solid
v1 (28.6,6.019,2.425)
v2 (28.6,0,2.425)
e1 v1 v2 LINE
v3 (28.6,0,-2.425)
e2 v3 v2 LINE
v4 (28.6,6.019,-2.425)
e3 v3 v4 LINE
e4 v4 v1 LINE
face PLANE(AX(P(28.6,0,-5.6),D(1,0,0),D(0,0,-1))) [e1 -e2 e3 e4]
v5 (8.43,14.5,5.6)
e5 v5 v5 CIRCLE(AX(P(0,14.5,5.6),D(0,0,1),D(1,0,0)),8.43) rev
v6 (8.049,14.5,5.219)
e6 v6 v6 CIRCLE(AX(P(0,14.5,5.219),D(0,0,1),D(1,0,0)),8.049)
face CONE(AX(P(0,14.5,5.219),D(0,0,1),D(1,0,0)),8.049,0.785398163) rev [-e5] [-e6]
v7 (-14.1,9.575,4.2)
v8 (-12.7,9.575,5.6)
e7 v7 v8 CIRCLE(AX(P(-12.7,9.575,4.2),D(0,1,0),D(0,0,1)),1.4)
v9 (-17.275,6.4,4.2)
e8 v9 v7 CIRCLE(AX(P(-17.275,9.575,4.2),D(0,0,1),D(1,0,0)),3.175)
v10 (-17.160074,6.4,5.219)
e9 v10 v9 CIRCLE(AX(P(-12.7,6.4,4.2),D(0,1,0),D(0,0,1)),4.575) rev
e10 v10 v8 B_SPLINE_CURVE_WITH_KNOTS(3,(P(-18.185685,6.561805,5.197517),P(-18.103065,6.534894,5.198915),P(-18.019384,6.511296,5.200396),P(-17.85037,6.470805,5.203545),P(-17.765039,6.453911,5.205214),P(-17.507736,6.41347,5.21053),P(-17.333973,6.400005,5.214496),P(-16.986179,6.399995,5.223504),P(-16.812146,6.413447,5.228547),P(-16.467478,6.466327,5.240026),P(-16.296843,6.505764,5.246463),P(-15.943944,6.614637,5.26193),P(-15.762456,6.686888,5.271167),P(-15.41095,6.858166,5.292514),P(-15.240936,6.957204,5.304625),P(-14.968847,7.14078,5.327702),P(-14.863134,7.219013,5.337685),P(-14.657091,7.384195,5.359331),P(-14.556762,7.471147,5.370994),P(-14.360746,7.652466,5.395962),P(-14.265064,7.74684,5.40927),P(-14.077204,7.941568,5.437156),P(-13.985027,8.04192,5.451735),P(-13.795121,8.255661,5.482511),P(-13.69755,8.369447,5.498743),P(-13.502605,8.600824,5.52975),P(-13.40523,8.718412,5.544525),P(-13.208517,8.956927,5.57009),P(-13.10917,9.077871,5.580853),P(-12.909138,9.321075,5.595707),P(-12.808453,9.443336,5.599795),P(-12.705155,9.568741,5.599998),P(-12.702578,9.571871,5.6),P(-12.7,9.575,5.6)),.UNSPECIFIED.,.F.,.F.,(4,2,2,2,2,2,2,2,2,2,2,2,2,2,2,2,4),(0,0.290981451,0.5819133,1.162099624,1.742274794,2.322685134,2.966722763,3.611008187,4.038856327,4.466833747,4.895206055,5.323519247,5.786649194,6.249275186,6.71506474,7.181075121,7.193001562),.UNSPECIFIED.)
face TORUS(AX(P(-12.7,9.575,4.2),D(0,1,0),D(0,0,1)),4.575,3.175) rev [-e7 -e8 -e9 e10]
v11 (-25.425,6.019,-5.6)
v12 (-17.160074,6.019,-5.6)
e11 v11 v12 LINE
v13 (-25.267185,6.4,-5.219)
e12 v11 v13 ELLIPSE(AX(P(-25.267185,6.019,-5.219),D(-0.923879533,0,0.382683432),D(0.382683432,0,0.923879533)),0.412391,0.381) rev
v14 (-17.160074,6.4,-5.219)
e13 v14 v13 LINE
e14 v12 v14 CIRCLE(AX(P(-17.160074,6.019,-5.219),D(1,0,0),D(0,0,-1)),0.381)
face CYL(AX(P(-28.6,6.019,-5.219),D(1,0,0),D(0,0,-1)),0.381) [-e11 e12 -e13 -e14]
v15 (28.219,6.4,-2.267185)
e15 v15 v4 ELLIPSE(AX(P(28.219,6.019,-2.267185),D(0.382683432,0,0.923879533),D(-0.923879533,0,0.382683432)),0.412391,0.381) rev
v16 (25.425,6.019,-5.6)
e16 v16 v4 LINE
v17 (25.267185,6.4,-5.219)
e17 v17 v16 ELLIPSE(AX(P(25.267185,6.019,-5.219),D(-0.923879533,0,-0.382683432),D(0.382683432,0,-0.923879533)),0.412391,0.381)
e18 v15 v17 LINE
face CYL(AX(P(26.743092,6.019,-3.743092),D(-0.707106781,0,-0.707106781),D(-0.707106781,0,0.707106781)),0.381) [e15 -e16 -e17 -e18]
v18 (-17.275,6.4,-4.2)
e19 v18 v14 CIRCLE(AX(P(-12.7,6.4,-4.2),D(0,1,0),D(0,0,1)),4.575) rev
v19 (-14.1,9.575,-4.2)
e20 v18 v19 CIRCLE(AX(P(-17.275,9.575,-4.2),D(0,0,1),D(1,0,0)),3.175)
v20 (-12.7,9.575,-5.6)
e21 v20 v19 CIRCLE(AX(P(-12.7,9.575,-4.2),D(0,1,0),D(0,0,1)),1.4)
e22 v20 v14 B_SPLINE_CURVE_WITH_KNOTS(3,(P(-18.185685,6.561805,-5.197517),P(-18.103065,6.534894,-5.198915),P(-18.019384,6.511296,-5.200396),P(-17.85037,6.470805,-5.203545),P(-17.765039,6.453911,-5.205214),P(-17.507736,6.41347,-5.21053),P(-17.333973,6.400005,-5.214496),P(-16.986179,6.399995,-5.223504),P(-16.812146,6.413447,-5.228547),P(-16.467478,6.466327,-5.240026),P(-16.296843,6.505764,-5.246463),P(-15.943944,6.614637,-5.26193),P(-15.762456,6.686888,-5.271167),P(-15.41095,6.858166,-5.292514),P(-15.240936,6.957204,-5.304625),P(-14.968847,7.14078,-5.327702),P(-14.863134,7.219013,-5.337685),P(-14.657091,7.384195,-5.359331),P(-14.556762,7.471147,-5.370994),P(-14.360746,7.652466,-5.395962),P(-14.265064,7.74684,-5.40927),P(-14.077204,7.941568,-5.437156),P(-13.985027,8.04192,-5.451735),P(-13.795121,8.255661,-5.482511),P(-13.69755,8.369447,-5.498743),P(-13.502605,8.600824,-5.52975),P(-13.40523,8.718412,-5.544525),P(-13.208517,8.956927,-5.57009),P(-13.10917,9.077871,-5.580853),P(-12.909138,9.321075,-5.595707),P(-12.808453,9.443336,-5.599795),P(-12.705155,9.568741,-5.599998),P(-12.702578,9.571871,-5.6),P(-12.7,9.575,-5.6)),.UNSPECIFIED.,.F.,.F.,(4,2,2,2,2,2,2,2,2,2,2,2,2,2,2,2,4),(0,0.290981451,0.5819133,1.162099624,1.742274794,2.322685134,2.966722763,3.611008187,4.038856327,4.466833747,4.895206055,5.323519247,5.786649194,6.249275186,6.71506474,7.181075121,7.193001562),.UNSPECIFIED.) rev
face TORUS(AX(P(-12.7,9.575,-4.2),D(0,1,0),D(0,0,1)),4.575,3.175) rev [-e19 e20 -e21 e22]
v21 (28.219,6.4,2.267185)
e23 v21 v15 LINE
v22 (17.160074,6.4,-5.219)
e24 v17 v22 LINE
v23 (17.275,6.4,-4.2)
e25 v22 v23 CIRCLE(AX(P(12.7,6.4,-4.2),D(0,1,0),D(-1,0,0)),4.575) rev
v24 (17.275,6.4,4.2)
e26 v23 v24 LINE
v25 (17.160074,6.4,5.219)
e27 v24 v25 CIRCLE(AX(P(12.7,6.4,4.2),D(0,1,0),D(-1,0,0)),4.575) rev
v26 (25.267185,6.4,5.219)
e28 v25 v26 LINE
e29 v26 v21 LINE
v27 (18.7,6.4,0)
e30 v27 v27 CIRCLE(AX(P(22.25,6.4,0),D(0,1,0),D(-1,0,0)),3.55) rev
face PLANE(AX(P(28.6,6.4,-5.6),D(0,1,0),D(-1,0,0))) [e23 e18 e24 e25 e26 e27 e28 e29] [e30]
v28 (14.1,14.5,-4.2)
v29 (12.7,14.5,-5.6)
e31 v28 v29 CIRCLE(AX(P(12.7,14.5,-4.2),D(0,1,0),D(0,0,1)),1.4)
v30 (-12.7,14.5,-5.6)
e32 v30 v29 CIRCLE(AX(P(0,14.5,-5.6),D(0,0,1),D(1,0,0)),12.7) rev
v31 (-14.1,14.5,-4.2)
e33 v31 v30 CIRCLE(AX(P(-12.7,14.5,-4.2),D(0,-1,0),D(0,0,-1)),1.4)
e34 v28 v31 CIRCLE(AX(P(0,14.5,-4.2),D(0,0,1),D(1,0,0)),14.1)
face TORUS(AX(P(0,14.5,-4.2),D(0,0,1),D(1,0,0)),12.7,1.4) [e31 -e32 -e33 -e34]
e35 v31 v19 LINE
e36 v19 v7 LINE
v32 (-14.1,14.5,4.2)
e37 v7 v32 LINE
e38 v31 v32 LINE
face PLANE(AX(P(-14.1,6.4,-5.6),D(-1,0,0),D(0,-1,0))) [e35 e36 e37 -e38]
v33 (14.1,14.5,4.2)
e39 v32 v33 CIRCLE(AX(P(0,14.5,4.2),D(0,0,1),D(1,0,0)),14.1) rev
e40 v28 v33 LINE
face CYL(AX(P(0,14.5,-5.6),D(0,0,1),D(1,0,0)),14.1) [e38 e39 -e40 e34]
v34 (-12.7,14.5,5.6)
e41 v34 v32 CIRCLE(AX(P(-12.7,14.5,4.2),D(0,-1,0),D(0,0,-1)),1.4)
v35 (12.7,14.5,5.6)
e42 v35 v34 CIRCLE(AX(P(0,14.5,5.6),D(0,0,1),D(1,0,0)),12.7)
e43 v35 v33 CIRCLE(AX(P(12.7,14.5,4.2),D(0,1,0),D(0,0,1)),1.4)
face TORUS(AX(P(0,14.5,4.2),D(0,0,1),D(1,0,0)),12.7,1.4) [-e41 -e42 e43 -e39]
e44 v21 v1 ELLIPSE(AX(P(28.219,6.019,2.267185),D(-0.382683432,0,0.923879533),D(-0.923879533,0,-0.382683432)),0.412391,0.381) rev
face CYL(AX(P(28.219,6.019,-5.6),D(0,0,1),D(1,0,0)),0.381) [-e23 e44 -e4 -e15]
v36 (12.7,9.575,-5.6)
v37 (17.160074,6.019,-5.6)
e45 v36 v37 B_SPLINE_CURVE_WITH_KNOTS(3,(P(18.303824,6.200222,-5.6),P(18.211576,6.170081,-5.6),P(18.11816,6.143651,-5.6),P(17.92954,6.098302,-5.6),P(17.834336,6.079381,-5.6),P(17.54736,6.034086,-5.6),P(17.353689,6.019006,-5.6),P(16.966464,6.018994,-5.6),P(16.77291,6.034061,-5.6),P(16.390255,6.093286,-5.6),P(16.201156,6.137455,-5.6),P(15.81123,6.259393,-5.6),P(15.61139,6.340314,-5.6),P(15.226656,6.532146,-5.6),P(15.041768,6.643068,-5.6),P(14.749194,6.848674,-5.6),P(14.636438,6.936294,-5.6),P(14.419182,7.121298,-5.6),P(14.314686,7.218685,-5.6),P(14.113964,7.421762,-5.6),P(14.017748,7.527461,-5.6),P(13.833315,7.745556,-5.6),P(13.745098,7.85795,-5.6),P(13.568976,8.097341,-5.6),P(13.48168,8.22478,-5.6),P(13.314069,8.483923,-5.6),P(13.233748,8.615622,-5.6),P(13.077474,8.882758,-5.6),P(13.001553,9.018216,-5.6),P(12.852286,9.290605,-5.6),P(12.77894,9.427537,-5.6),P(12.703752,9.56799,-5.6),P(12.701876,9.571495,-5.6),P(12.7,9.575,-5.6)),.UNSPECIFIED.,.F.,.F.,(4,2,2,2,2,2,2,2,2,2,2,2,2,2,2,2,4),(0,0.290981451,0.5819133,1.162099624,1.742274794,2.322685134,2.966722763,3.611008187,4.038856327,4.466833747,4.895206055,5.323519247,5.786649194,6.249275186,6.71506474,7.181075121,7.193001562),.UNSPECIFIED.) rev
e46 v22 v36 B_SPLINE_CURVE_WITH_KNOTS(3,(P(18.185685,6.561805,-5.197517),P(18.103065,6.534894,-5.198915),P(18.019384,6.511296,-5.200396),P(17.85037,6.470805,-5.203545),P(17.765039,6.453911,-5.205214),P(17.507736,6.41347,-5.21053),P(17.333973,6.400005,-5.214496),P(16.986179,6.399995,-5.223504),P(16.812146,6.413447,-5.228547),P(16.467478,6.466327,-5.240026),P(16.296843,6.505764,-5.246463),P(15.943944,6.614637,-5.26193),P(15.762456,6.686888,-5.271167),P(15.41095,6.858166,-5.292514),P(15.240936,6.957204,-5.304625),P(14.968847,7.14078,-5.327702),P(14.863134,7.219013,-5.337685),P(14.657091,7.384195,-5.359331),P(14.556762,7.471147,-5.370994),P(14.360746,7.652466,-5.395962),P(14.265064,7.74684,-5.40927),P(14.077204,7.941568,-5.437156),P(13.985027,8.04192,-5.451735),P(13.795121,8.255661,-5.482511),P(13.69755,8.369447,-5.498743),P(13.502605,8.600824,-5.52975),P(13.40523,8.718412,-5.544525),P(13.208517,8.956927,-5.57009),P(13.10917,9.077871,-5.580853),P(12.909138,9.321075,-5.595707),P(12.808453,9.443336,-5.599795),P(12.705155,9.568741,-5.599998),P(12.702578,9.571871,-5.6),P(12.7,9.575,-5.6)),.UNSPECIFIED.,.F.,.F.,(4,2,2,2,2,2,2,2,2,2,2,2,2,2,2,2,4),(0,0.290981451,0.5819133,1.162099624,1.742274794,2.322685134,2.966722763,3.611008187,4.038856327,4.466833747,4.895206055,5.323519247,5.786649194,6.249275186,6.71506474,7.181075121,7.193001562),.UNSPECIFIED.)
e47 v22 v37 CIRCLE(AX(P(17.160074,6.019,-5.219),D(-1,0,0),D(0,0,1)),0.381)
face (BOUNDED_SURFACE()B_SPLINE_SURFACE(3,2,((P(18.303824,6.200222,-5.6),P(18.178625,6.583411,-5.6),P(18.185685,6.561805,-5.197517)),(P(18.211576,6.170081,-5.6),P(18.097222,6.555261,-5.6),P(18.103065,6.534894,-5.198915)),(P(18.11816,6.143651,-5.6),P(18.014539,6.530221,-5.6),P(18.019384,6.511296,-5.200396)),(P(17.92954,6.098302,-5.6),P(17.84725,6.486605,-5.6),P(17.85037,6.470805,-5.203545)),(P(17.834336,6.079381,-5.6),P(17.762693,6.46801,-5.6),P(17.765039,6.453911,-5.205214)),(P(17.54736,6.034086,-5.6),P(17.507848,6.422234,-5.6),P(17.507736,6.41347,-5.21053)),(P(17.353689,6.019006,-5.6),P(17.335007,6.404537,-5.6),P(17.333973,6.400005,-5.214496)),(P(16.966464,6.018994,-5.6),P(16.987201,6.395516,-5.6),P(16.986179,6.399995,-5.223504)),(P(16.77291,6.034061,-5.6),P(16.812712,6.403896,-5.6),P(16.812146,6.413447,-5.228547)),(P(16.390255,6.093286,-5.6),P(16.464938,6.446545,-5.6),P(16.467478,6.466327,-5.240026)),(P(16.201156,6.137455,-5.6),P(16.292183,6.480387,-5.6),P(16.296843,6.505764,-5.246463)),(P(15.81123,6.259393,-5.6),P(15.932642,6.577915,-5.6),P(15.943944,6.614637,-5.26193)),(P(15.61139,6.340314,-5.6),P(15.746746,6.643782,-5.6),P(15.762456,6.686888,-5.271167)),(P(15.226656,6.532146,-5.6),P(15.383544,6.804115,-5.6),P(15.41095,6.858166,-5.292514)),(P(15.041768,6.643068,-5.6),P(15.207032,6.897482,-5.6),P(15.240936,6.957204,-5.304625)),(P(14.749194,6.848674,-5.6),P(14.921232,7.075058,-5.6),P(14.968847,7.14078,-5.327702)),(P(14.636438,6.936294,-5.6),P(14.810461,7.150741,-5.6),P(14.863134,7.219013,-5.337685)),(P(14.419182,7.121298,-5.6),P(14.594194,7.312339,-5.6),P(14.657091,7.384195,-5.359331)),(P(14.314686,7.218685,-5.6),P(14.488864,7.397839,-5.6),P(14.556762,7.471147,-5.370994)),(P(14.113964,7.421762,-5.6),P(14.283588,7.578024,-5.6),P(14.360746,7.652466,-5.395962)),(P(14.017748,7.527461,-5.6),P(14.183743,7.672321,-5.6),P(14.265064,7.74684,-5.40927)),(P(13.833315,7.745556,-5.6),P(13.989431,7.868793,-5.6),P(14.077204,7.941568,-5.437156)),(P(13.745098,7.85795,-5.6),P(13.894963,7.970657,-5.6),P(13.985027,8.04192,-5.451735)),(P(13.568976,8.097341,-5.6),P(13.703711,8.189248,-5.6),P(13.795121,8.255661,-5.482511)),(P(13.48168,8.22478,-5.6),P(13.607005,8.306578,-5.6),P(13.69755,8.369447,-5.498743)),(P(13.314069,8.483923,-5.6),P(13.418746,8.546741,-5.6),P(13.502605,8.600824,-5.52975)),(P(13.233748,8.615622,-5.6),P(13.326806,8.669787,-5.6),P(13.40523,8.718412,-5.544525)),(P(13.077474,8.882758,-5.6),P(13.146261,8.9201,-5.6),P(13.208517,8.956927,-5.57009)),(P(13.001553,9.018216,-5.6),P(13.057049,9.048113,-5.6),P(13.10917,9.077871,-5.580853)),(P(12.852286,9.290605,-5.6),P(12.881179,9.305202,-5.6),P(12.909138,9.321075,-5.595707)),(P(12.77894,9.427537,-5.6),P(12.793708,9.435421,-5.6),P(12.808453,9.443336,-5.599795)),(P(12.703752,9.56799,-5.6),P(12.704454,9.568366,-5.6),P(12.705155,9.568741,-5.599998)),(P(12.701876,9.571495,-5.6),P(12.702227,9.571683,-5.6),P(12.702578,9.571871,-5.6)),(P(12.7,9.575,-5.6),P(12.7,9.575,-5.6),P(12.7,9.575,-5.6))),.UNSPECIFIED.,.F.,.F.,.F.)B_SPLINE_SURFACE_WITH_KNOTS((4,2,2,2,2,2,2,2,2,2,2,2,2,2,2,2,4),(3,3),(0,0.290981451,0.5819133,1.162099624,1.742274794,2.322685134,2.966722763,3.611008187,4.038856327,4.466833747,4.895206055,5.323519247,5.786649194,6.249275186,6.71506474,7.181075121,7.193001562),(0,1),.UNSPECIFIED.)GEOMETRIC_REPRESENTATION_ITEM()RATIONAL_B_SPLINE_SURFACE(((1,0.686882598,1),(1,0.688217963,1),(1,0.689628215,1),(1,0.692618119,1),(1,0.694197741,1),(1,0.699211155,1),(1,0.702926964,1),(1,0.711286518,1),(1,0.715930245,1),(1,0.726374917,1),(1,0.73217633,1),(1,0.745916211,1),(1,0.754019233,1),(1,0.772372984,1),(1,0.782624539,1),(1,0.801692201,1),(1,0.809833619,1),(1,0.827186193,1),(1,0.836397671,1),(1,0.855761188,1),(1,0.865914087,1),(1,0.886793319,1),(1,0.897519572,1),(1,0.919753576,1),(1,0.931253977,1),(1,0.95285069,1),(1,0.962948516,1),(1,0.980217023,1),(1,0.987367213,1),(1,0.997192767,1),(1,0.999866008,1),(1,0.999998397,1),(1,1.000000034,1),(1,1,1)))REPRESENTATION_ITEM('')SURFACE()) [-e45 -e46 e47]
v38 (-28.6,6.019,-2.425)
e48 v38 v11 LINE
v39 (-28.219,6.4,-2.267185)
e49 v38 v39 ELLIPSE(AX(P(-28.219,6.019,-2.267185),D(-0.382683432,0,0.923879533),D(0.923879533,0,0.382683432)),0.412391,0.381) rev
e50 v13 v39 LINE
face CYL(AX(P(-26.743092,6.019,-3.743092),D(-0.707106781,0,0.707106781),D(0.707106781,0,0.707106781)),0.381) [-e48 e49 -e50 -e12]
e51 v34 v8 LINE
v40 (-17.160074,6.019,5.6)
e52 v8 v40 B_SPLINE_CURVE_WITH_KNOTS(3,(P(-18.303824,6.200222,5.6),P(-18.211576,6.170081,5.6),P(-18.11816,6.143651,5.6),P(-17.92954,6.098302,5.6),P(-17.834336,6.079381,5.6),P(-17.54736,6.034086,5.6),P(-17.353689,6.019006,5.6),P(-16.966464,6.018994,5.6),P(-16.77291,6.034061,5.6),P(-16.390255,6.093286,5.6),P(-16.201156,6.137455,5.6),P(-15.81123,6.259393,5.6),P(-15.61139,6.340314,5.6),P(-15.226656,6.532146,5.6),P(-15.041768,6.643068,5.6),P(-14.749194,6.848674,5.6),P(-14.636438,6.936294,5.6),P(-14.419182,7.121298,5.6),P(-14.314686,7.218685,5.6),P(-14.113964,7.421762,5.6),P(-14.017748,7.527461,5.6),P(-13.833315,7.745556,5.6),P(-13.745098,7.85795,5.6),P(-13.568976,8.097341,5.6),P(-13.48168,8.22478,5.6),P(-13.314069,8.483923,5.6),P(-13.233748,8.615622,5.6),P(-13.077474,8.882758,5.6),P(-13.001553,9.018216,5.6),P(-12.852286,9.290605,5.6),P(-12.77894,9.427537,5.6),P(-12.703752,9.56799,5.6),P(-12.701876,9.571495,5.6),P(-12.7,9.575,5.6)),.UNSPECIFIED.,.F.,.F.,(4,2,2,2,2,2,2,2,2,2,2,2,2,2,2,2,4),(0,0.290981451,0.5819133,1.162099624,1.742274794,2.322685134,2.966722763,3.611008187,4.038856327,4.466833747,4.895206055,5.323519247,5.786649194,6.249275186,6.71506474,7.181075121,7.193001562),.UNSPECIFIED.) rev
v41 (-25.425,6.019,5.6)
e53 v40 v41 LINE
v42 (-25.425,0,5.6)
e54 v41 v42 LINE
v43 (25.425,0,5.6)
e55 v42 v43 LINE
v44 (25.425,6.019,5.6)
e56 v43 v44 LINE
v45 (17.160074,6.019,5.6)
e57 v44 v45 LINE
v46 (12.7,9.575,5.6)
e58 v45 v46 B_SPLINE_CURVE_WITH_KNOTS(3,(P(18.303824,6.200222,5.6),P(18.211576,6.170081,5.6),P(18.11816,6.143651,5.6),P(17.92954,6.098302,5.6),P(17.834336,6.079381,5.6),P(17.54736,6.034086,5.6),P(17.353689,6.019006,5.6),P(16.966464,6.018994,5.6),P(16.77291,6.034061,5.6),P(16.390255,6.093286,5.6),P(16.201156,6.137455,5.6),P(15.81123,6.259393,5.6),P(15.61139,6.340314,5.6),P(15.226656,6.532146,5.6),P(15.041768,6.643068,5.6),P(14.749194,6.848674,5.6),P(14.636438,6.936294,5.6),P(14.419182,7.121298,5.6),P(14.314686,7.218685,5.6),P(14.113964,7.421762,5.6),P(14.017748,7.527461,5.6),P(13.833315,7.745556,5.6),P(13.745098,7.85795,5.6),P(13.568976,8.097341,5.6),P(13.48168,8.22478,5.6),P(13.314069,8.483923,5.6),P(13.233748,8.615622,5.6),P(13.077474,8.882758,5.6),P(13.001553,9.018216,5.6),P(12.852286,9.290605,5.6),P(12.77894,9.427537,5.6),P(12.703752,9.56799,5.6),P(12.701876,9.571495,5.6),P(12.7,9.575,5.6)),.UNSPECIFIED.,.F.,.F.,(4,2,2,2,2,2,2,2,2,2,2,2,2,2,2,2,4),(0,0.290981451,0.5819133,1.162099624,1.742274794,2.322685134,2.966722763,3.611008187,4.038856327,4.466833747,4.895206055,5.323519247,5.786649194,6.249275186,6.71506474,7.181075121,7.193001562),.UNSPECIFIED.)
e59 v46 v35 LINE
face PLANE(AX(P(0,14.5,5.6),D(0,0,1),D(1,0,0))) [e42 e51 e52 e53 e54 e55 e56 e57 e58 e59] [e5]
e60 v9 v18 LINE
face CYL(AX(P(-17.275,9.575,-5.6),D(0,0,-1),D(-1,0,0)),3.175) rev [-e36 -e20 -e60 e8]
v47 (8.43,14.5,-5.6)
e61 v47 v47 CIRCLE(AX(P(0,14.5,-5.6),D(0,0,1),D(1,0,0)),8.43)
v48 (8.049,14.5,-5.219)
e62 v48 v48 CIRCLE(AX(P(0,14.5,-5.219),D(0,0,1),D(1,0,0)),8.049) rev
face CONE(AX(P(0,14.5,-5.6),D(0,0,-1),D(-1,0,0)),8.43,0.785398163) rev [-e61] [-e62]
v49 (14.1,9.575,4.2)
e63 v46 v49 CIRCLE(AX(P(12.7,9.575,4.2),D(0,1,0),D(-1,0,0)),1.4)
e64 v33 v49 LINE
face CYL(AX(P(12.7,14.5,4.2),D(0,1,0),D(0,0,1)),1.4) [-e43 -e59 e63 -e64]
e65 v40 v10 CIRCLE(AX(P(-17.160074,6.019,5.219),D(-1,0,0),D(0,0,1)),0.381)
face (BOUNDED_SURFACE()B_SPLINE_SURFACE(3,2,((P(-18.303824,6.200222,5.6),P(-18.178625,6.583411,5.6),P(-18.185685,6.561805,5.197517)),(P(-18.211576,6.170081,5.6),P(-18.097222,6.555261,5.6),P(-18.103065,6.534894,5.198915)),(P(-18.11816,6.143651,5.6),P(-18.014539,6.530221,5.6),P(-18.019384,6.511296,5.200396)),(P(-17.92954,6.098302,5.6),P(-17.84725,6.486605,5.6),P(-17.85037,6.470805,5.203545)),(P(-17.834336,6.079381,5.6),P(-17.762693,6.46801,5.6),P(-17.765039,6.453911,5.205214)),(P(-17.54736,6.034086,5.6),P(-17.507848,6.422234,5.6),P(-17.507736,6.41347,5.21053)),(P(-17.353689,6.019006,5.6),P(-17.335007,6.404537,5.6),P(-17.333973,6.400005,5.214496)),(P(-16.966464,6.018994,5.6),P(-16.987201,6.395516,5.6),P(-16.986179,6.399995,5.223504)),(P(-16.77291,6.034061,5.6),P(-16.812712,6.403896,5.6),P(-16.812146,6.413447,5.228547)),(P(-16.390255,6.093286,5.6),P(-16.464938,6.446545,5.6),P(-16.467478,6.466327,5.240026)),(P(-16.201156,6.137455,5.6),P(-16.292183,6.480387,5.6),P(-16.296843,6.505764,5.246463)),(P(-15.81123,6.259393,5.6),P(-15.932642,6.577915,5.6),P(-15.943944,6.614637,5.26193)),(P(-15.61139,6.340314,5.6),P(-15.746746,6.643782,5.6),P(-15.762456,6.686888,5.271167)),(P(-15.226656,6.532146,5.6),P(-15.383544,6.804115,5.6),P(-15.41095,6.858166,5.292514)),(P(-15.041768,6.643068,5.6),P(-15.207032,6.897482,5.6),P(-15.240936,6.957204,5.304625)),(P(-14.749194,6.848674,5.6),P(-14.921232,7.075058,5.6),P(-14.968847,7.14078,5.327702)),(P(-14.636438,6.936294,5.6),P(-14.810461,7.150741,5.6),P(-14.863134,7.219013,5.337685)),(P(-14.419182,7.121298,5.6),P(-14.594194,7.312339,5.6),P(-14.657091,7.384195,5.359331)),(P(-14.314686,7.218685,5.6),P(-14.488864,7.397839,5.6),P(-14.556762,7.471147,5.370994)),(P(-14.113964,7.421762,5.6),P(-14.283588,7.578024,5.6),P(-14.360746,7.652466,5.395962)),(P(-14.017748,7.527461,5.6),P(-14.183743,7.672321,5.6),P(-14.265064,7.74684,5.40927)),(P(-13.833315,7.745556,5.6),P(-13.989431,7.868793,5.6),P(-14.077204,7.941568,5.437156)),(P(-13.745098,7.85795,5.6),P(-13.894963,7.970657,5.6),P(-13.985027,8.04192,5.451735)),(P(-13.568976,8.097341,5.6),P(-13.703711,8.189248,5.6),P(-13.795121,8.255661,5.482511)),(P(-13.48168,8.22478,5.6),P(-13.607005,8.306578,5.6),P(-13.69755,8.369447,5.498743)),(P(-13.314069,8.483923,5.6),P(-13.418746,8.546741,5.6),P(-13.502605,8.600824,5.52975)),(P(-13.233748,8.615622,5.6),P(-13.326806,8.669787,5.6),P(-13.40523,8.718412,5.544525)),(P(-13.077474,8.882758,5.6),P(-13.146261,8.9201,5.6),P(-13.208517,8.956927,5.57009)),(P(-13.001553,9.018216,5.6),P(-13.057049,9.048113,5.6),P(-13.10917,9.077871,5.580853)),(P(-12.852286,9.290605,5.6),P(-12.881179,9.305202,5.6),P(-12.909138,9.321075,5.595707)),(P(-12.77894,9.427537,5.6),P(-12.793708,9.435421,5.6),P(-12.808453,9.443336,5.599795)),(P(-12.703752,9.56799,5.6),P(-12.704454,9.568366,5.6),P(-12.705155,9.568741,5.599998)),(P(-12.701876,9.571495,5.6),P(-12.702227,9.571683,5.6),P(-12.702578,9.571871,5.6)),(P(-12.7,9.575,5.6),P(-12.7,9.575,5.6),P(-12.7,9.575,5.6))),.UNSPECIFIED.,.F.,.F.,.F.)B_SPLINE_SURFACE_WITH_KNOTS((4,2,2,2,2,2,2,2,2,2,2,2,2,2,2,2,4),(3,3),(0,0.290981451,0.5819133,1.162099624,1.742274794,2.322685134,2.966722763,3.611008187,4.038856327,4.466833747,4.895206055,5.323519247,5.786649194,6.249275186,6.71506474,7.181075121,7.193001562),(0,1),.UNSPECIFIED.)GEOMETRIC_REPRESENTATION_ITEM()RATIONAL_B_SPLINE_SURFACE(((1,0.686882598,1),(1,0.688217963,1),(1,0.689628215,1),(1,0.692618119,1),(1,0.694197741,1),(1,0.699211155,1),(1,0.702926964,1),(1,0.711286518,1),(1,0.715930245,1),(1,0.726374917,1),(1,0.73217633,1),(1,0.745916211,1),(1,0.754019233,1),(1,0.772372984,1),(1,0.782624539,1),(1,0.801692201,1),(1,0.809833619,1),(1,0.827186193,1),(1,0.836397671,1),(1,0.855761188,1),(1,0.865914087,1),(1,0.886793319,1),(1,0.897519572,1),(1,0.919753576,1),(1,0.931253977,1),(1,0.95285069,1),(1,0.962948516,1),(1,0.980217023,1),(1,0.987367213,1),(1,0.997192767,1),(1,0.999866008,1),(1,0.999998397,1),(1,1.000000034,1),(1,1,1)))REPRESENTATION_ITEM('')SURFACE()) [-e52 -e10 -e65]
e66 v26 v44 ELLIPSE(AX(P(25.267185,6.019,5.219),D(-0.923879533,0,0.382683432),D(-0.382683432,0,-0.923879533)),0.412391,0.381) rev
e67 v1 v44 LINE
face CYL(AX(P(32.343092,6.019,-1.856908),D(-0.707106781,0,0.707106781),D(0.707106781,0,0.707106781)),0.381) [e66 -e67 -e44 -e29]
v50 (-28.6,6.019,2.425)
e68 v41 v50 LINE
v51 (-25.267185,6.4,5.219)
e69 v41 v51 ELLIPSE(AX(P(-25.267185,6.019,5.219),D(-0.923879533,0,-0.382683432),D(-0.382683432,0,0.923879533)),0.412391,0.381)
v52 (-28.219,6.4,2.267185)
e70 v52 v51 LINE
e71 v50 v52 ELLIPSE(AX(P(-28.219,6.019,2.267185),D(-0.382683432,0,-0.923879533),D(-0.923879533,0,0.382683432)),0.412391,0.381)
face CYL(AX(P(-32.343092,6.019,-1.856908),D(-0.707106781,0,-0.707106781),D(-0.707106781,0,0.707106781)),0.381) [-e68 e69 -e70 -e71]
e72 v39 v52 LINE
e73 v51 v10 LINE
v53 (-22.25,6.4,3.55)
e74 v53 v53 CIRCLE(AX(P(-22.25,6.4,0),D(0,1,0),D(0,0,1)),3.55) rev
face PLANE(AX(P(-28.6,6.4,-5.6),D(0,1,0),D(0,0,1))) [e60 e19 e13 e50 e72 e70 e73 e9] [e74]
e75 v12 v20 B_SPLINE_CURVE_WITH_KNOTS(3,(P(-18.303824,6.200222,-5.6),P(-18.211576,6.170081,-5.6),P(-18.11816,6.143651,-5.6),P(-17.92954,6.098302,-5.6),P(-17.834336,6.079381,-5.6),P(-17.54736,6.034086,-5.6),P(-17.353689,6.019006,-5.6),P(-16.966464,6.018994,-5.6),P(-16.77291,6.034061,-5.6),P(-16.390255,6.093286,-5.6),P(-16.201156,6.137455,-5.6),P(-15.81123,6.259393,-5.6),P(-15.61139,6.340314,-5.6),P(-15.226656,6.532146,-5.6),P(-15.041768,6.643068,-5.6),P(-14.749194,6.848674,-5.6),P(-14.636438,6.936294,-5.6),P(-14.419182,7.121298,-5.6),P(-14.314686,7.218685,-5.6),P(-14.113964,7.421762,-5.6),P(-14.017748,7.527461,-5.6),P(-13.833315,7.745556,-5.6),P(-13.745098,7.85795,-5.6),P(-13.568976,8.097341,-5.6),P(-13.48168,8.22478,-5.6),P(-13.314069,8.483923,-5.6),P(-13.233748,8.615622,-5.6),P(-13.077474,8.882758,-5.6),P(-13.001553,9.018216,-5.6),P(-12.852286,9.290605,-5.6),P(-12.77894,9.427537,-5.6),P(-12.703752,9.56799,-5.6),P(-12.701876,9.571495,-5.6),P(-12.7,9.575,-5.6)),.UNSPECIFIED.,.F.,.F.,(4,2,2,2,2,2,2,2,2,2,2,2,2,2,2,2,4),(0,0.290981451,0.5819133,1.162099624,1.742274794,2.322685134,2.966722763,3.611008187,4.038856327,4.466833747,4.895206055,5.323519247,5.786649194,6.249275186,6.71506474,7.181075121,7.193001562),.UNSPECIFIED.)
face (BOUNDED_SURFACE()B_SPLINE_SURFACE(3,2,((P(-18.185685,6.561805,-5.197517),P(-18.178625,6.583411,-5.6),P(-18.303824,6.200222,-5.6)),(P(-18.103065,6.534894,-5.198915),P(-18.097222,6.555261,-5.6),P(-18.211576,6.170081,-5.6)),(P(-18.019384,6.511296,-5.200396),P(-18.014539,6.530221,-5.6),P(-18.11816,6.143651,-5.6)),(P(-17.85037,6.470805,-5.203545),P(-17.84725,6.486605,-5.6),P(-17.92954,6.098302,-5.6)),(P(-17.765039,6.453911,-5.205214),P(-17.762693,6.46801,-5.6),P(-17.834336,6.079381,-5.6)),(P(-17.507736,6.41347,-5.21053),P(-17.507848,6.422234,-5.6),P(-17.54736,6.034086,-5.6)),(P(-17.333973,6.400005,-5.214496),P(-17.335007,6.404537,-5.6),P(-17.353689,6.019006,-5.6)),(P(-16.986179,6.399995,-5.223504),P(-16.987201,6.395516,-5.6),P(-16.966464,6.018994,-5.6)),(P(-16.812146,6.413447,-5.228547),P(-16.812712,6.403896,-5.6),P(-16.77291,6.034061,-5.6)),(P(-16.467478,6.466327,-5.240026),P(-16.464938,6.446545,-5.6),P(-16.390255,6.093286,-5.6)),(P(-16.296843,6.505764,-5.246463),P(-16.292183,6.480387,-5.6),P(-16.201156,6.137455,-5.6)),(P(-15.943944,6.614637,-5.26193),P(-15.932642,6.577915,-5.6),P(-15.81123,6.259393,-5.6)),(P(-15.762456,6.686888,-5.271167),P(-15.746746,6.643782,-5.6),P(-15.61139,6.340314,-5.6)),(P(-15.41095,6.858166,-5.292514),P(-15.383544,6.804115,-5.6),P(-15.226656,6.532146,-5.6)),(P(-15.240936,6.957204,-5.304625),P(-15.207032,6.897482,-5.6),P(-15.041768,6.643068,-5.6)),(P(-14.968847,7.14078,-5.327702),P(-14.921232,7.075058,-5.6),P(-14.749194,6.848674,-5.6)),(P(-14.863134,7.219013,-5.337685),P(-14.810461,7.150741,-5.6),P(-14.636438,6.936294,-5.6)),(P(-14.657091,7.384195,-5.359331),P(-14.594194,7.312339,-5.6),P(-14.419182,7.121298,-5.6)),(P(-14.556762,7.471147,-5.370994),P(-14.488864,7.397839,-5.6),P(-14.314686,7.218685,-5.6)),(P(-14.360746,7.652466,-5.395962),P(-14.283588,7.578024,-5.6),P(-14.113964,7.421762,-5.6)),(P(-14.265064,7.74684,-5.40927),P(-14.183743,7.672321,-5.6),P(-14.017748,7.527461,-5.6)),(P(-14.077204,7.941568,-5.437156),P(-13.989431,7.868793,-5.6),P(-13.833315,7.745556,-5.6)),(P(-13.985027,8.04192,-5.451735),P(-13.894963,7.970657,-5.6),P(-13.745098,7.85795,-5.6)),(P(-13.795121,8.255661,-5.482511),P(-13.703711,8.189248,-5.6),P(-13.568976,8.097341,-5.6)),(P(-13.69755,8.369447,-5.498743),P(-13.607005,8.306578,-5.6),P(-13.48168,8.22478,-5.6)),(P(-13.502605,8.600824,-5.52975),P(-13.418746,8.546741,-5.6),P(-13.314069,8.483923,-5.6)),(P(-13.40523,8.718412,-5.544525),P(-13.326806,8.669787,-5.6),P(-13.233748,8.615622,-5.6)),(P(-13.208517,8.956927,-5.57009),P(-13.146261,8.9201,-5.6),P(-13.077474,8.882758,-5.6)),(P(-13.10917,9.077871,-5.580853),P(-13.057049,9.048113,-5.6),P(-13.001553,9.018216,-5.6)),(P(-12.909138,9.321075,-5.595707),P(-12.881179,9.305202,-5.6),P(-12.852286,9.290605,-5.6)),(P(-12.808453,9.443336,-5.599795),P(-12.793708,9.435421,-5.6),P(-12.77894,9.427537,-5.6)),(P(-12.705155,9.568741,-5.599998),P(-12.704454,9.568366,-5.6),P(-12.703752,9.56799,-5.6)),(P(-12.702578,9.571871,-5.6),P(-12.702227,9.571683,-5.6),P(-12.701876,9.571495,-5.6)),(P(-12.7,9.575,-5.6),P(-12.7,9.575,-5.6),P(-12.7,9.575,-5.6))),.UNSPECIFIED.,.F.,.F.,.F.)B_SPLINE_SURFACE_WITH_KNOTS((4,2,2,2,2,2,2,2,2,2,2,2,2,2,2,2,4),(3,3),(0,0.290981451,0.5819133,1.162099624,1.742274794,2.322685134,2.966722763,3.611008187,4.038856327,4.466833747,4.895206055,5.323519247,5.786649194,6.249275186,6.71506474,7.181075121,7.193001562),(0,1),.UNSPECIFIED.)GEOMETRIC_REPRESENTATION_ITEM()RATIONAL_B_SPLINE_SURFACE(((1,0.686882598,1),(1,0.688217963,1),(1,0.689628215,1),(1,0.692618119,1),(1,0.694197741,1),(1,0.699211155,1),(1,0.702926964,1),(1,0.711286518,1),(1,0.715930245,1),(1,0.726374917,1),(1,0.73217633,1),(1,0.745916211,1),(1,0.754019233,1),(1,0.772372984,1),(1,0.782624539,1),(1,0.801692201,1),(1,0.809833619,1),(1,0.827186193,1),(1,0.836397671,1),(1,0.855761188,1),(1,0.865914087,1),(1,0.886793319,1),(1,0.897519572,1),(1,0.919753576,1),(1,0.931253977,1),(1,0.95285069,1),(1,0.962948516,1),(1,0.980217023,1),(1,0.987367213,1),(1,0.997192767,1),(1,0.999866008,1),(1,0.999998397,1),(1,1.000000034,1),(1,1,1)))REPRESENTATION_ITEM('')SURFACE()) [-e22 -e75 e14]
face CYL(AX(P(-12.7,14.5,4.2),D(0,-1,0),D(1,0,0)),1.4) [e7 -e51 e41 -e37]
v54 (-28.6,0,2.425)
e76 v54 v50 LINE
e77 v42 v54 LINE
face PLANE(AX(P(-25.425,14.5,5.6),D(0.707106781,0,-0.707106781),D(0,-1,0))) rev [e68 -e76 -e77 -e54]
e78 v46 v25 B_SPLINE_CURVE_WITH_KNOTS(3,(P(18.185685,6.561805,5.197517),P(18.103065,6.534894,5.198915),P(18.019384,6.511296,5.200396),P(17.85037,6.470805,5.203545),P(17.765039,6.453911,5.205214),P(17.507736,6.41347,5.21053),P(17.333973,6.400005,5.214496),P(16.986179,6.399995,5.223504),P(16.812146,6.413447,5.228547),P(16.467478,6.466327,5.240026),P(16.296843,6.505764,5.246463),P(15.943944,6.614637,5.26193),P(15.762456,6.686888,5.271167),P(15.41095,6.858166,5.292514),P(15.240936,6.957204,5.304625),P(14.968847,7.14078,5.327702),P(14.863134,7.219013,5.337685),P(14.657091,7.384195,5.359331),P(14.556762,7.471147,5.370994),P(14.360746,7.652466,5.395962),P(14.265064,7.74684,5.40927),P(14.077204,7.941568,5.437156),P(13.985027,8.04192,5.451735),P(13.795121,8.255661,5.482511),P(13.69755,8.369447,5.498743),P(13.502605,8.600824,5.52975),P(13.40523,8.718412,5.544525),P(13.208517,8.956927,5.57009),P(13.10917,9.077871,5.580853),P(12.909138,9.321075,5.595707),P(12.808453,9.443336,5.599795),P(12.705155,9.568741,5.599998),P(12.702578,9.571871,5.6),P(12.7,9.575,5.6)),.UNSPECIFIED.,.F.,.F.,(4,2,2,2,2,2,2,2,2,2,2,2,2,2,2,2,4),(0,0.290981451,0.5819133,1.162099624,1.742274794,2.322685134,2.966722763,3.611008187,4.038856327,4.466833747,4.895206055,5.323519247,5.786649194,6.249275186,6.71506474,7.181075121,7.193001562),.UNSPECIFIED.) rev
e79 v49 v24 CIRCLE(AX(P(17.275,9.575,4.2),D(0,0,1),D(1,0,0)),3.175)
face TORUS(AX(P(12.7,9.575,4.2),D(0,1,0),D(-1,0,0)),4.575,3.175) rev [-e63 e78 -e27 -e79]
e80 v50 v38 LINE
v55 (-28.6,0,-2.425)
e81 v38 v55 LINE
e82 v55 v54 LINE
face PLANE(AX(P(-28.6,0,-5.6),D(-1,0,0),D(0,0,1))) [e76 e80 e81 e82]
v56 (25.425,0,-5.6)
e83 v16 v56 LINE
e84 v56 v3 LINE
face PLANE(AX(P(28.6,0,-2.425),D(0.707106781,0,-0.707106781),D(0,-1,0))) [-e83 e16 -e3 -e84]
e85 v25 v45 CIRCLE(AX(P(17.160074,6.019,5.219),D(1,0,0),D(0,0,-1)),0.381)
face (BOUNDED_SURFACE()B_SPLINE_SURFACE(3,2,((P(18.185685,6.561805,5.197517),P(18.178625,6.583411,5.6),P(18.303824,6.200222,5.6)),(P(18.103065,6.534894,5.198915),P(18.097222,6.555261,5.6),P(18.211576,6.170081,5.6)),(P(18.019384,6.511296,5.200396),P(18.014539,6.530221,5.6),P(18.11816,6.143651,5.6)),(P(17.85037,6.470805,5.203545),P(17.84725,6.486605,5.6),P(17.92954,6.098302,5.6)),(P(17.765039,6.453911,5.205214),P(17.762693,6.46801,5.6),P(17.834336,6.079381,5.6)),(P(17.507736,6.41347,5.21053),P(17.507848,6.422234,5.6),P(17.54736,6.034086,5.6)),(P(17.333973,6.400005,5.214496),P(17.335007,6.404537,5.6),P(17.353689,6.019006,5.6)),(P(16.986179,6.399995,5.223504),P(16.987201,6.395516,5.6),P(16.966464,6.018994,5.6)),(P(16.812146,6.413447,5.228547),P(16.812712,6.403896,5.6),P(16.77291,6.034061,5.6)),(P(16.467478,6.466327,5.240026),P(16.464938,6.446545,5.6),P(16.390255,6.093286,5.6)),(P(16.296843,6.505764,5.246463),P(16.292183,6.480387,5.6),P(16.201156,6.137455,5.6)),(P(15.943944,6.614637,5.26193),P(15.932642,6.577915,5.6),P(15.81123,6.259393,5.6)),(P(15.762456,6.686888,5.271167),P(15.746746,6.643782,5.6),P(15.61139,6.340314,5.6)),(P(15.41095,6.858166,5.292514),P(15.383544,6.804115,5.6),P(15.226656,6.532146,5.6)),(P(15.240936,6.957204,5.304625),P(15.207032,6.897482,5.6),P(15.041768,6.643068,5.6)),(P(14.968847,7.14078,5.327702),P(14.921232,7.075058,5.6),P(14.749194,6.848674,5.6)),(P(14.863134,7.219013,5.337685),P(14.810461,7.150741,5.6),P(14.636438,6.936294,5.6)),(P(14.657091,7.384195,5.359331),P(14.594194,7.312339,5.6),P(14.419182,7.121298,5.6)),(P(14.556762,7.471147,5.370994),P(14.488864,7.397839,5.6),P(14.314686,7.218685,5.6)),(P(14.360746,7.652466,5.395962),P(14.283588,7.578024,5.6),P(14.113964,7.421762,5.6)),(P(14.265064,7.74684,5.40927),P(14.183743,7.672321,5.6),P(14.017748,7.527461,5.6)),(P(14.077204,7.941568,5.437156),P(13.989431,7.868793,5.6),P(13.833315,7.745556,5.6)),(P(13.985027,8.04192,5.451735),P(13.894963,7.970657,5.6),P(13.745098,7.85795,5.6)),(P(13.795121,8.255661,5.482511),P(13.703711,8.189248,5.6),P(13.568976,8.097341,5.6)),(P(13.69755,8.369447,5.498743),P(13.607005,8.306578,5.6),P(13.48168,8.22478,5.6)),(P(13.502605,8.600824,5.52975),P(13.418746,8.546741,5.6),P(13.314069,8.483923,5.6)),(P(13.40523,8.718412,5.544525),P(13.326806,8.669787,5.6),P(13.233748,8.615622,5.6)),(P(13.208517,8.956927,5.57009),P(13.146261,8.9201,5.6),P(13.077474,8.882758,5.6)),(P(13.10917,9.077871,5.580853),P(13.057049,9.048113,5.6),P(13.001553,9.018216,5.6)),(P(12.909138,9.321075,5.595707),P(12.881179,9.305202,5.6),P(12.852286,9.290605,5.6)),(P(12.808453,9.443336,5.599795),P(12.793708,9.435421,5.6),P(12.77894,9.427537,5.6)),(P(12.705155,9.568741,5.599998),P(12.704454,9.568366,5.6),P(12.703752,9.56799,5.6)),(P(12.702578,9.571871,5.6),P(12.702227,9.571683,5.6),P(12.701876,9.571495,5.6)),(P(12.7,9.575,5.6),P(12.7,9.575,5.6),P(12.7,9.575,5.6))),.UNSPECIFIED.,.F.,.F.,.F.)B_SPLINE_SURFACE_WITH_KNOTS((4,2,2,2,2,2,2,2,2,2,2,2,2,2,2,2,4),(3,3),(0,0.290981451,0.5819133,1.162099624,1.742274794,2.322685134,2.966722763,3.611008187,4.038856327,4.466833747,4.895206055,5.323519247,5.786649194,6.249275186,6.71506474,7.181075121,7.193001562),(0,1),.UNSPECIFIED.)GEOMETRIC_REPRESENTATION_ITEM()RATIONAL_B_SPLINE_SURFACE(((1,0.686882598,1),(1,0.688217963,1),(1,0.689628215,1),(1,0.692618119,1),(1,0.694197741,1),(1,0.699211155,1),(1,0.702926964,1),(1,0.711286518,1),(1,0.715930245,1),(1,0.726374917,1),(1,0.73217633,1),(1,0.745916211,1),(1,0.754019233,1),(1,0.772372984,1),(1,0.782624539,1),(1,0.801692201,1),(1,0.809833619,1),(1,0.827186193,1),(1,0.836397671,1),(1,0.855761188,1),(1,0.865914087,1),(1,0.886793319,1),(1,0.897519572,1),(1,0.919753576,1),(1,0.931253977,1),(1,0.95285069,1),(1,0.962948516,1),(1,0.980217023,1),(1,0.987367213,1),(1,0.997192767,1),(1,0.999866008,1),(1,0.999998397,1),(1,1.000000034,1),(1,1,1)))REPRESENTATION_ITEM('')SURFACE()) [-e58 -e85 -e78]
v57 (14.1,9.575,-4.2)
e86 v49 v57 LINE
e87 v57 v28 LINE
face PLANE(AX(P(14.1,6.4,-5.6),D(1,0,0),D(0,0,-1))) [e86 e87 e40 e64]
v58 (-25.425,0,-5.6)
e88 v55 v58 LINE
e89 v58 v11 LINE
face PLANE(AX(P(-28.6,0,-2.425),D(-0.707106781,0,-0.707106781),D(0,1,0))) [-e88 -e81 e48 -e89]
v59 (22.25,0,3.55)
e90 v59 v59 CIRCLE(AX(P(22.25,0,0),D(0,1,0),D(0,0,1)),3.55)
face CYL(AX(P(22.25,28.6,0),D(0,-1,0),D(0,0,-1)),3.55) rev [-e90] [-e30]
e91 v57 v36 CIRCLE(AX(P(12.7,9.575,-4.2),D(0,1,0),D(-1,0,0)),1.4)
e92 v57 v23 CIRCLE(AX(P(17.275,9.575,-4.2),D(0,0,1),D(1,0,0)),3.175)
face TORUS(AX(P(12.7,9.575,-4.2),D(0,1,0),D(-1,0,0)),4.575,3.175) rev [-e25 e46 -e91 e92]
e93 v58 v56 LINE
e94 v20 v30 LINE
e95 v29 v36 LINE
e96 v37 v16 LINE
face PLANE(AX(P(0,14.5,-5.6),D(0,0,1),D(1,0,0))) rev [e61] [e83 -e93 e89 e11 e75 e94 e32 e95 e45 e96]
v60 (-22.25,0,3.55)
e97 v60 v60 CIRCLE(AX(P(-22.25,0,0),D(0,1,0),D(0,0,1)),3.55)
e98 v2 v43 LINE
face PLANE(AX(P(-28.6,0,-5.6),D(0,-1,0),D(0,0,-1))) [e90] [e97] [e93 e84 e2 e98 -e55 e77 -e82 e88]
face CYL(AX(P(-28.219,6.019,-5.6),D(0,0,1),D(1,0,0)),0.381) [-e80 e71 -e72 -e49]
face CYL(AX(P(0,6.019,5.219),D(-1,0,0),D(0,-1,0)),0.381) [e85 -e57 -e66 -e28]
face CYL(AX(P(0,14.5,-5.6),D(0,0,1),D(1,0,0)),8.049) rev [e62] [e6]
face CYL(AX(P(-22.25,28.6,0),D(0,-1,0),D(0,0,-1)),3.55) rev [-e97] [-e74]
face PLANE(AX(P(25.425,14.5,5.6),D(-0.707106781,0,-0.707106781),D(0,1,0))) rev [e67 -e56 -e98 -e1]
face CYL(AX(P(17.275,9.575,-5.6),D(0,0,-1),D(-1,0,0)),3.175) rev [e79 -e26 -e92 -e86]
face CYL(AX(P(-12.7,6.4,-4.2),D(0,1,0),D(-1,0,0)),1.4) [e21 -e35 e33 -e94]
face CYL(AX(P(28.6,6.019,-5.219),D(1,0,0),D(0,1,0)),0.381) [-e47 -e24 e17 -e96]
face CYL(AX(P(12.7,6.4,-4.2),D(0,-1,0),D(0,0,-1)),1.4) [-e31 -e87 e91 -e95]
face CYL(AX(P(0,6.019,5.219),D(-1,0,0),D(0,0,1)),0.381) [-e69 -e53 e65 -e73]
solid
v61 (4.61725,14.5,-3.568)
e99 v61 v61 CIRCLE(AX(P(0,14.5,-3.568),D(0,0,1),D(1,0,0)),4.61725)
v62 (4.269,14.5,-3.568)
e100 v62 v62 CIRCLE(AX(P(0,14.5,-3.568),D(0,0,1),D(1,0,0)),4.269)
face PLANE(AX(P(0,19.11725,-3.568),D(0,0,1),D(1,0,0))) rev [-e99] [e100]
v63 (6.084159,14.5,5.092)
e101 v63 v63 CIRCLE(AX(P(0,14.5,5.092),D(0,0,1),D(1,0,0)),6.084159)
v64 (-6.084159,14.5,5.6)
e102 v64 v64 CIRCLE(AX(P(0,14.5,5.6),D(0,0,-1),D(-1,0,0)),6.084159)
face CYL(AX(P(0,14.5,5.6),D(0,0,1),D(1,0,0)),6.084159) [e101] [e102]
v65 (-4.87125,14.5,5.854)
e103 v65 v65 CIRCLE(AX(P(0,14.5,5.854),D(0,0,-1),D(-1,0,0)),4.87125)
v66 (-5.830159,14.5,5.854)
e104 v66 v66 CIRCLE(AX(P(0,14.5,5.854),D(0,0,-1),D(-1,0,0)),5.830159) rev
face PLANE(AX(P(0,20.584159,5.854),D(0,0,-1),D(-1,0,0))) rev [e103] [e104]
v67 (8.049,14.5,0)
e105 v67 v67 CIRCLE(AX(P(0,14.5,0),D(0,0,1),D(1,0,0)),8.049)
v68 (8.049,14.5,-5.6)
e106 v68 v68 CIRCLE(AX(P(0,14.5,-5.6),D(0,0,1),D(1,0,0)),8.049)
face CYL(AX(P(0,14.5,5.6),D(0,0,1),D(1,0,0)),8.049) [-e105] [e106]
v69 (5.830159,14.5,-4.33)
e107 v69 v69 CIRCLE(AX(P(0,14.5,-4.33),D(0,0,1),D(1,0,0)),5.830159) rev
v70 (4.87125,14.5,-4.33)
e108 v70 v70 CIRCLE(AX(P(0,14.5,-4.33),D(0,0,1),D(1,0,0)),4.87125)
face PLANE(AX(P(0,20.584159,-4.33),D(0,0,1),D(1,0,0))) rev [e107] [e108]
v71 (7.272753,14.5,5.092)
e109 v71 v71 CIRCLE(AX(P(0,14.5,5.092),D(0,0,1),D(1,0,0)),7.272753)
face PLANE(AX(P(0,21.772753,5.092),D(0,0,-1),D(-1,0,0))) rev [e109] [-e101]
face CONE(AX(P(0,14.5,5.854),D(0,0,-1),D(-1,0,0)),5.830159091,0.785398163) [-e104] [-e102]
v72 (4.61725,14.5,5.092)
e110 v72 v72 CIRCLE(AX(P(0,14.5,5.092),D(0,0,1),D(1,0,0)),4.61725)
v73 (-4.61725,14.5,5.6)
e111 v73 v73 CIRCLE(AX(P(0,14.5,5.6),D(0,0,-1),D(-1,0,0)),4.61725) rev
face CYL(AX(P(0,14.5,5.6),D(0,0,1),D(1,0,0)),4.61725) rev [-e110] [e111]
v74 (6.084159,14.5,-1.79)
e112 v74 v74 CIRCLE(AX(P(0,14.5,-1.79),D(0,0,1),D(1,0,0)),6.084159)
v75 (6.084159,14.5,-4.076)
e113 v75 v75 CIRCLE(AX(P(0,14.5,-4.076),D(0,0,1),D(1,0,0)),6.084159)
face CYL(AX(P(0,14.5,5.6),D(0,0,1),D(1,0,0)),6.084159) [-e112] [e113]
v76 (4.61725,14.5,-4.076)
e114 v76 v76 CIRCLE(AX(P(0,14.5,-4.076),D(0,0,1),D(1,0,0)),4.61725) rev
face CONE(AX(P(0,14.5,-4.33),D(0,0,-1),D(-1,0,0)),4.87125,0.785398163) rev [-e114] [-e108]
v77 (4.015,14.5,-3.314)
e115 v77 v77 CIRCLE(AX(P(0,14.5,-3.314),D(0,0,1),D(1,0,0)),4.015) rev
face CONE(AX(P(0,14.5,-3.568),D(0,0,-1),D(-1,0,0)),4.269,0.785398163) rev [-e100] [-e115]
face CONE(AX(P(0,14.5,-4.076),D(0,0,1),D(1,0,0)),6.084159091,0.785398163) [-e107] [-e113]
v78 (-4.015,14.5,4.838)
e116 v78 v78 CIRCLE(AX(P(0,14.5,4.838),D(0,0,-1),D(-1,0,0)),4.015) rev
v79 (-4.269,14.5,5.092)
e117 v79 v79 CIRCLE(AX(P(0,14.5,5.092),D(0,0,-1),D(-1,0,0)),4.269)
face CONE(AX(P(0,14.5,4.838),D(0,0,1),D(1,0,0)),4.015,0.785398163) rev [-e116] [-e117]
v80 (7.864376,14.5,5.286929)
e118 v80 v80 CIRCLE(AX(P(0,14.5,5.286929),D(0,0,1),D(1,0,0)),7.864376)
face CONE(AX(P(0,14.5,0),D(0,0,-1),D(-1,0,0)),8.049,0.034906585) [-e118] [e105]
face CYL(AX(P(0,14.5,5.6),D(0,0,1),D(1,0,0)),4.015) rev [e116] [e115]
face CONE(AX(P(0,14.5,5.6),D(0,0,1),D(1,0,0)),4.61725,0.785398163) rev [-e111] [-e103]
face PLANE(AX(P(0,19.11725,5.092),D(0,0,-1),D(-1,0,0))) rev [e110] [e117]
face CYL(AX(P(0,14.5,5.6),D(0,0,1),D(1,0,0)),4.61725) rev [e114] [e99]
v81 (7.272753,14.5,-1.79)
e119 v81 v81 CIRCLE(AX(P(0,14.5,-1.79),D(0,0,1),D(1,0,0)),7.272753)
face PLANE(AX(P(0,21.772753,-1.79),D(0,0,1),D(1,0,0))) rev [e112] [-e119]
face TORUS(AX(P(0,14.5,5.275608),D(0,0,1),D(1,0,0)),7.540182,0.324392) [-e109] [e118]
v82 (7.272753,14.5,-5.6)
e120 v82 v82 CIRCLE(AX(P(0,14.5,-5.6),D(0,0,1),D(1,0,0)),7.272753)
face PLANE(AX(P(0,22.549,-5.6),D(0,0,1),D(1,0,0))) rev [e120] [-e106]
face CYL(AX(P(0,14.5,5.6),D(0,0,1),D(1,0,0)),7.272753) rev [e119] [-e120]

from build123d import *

# Parameters (mm, degrees)
BOSS_EXTRUDE1_DEPTH      = 5.6
BOSS_EXTRUDE1_DEPTH_BACK = 5.6
SKETCH3_R                = 8.049
SKETCH4_R                = 3.55
CUT_EXTRUDE1_DEPTH       = 41.832340124
CHAMFER1_SIZE            = 3.175
FILLET1_R                = 1.4
FILLET2_R                = 3.175
CHAMFER2_SIZE            = 0.381
FILLET3_R                = 0.381
CHAMFER3_SIZE            = 0.254


with BuildPart() as part:
    # Sketch3 → Boss-Extrude1 (new, two sides: drawn at the far end of the back side and taken through both)
    with BuildSketch(Plane.XY.offset(-BOSS_EXTRUDE1_DEPTH_BACK)):
        with BuildLine():
            Line((-28.6, 0), (-28.6, 6.4))
            Line((-28.6, 6.4), (-14.1, 6.4))
            Line((-14.1, 6.4), (-14.1, 14.5))
            ThreePointArc((-14.1, 14.5), (0, 28.6), (14.1, 14.5))
            Line((14.1, 14.5), (14.1, 6.4))
            Line((14.1, 6.4), (28.6, 6.4))
            Line((28.6, 6.4), (28.6, 0))
            Line((28.6, 0), (-28.6, 0))
        make_face()
        with Locations((0, 14.5)):
            Circle(SKETCH3_R, mode=Mode.SUBTRACT)
    extrude(amount=BOSS_EXTRUDE1_DEPTH + BOSS_EXTRUDE1_DEPTH_BACK)

    # Sketch4 → Cut-Extrude1 (cut, through all)
    with BuildSketch(Plane(origin=(0, 0, 0), x_dir=(1, 0, 0), z_dir=(0, 1, 0))):
        with Locations(Location((-22.25, 0, 0), (0, 0, 270))):
            Circle(SKETCH4_R)
        with Locations(Location((22.25, 0, 0), (0, 0, 180))):
            Circle(SKETCH4_R)
    extrude(amount=CUT_EXTRUDE1_DEPTH, mode=Mode.SUBTRACT)

    # Chamfer1
    chamfer1_edges = [part.edges().sort_by_distance(p)[0] for p in [
        (28.6, 3.2, 5.6),
        (-28.6, 3.2, -5.6),
        (-28.6, 3.2, 5.6),
        (28.6, 3.2, -5.6),
    ]]
    chamfer(chamfer1_edges, length=CHAMFER1_SIZE)

    # Fillet1
    fillet1_edges = [part.edges().sort_by_distance(p)[0] for p in [
        (14.1, 10.45, -5.6),
        (0, 28.6, -5.6),
        (-14.1, 10.45, -5.6),
        (14.1, 10.45, 5.6),
        (0, 28.6, 5.6),
        (-14.1, 10.45, 5.6),
    ]]
    fillet(fillet1_edges, radius=FILLET1_R)

    # Fillet2
    # the kernel refuses this fillet: 3.175 mm, written as the material it adds along each edge
    with BuildSketch(Plane(origin=(-14.1, 6.4, 4.2), x_dir=(-1, 0, 0), z_dir=(0, 0, -1))) as fillet2_piece_1:
        with BuildLine():
            CenterArc((FILLET2_R, FILLET2_R), FILLET2_R, 180, 90)
            Line((0, FILLET2_R), (0, 0))
            Line((0, 0), (FILLET2_R, 0))
        make_face()
    extrude(amount=8.4)
    with BuildSketch(Plane(origin=(14.1, 6.4, 4.2), x_dir=(1, 0, 0), z_dir=(0, 0, -1))) as fillet2_piece_2:
        with BuildLine():
            CenterArc((FILLET2_R, -FILLET2_R), FILLET2_R, 90, 90)
            Line((0, -FILLET2_R), (0, 0))
            Line((0, 0), (FILLET2_R, 0))
        make_face()
    extrude(amount=8.4)
    with BuildSketch(Plane(origin=(-12.7, 6.4, -4.2), x_dir=(-0.9999802608561371, 0, 0.006283143965558777), z_dir=(-0.006283143965558777, 0, -0.9999802608561371))) as fillet2_piece_3_section:
        with BuildLine():
            CenterArc((1.4 + FILLET2_R, FILLET2_R), FILLET2_R, 180, 90)
            Line((1.4, FILLET2_R), (1.4, 0))
            Line((1.4, 0), (1.4 + FILLET2_R, 0))
        make_face()
    fillet2_piece_3 = revolve(axis=Axis((-12.7, 6.4, -4.2), (0, 1, 0)), revolution_arc=359.64, mode=Mode.PRIVATE)
    fillet2_piece_3 = split(fillet2_piece_3, bisect_by=Plane(origin=(-12.7, 6.4, -5.6), z_dir=(0, 0, 1)), keep=Keep.TOP, mode=Mode.PRIVATE)
    add(fillet2_piece_3)
    with BuildSketch(Plane(origin=(-12.7, 6.4, 4.2), x_dir=(-0.9999802608561371, 0, -0.006283143965558777), z_dir=(-0.006283143965558777, 0, 0.9999802608561371))) as fillet2_piece_4_section:
        with BuildLine():
            CenterArc((1.4 + FILLET2_R, -FILLET2_R), FILLET2_R, 90, 90)
            Line((1.4, -FILLET2_R), (1.4, 0))
            Line((1.4, 0), (1.4 + FILLET2_R, 0))
        make_face()
    fillet2_piece_4 = revolve(axis=Axis((-12.7, 6.4, 4.2), (0, -1, 0)), revolution_arc=359.64, mode=Mode.PRIVATE)
    fillet2_piece_4 = split(fillet2_piece_4, bisect_by=Plane(origin=(-12.7, 6.4, 5.6), z_dir=(0, 0, -1)), keep=Keep.TOP, mode=Mode.PRIVATE)
    add(fillet2_piece_4)
    with BuildSketch(Plane(origin=(12.7, 6.4, -4.2), x_dir=(0.9999802608561371, 0, 0.006283143965558777), z_dir=(0.006283143965558777, 0, -0.9999802608561371))) as fillet2_piece_5_section:
        with BuildLine():
            CenterArc((1.4 + FILLET2_R, -FILLET2_R), FILLET2_R, 90, 90)
            Line((1.4, -FILLET2_R), (1.4, 0))
            Line((1.4, 0), (1.4 + FILLET2_R, 0))
        make_face()
    fillet2_piece_5 = revolve(axis=Axis((12.7, 6.4, -4.2), (0, -1, 0)), revolution_arc=359.64, mode=Mode.PRIVATE)
    fillet2_piece_5 = split(fillet2_piece_5, bisect_by=Plane(origin=(12.7, 6.4, -5.6), z_dir=(0, 0, 1)), keep=Keep.TOP, mode=Mode.PRIVATE)
    add(fillet2_piece_5)
    with BuildSketch(Plane(origin=(12.7, 6.4, 4.2), x_dir=(0.9999802608561371, 0, -0.006283143965558777), z_dir=(0.006283143965558777, 0, 0.9999802608561371))) as fillet2_piece_6_section:
        with BuildLine():
            CenterArc((1.4 + FILLET2_R, FILLET2_R), FILLET2_R, 180, 90)
            Line((1.4, FILLET2_R), (1.4, 0))
            Line((1.4, 0), (1.4 + FILLET2_R, 0))
        make_face()
    fillet2_piece_6 = revolve(axis=Axis((12.7, 6.4, 4.2), (0, 1, 0)), revolution_arc=359.64, mode=Mode.PRIVATE)
    fillet2_piece_6 = split(fillet2_piece_6, bisect_by=Plane(origin=(12.7, 6.4, 5.6), z_dir=(0, 0, -1)), keep=Keep.TOP, mode=Mode.PRIVATE)
    add(fillet2_piece_6)

    # Chamfer2
    chamfer2_edges = [part.edges().sort_by_distance(p)[0] for p in [
        (-8.049, 14.5, -5.6),
        (-8.049, 14.5, 5.6),
    ]]
    chamfer(chamfer2_edges, length=CHAMFER2_SIZE)

    # Fillet3
    fillet3_edges = [part.edges().sort_by_distance(p)[0] for p in [
        (-21.240264048, 6.4, -5.6),
        (-21.240264048, 6.4, 5.6),
        (-14.4783641, 7.398599024, -5.6),
        (-14.4783641, 7.398599024, 5.6),
        (14.4783641, 7.398599024, -5.6),
        (14.4783641, 7.398599024, 5.6),
        (-28.6, 6.4, 0),
        (21.240264048, 6.4, -5.6),
        (-27.0125, 6.4, 4.0125),
        (-27.0125, 6.4, -4.0125),
        (21.240264048, 6.4, 5.6),
        (28.6, 6.4, 0),
        (27.0125, 6.4, -4.0125),
        (27.0125, 6.4, 4.0125),
    ]]
    fillet(fillet3_edges, radius=FILLET3_R)


with BuildPart() as body_2:
    # Sketch6 → Revolve1 (revolve)
    with BuildSketch(Plane(origin=(0, 0, 0), x_dir=(0, 0, -1), z_dir=(1, 0, 0)), mode=Mode.PRIVATE) as revolve1_sk:
        with BuildLine():
            Line((0, 22.549), (5.6, 22.549))
            Line((5.6, 22.549), (5.6, 21.772752844))
            Line((5.6, 21.772752844), (1.79, 21.772752844))
            Line((1.79, 21.772752844), (1.79, 20.584159091))
            Line((1.79, 20.584159091), (4.33, 20.584159091))
            Line((4.33, 20.584159091), (4.33, 19.11725))
            Line((4.33, 19.11725), (3.568, 19.11725))
            Line((3.568, 19.11725), (3.568, 18.515))
            Line((3.568, 18.515), (-5.092, 18.515))
            Line((-5.092, 18.515), (-5.092, 19.11725))
            Line((-5.092, 19.11725), (-5.854, 19.11725))
            Line((-5.854, 19.11725), (-5.854, 20.584159091))
            Line((-5.854, 20.584159091), (-5.092, 20.584159091))
            Line((-5.092, 20.584159091), (-5.092, 21.772752844))
            ThreePointArc((-5.092, 21.772752844), (-5.583707431, 21.938668821), (-5.286929074, 22.364376368))
            Line((-5.286929074, 22.364376368), (0, 22.549))
        make_face()
    revolve(revolve1_sk.sketch.rotate(Axis((0, 14.5, 5.6), (0, 0, -1)), 90), axis=Axis((0, 14.5, 5.6), (0, 0, -1)))

    # Chamfer3
    chamfer3_edges = [body_2.edges().sort_by_distance(p)[0] for p in [
        (-6.084159091, 14.5, -4.33),
        (-4.61725, 14.5, -4.33),
        (-4.015, 14.5, -3.568),
        (-4.015, 14.5, 5.092),
        (-4.61725, 14.5, 5.854),
        (-6.084159091, 14.5, 5.854),
    ]]
    chamfer(chamfer3_edges, length=CHAMFER3_SIZE)


solid = Compound([part.part, body_2.part])
